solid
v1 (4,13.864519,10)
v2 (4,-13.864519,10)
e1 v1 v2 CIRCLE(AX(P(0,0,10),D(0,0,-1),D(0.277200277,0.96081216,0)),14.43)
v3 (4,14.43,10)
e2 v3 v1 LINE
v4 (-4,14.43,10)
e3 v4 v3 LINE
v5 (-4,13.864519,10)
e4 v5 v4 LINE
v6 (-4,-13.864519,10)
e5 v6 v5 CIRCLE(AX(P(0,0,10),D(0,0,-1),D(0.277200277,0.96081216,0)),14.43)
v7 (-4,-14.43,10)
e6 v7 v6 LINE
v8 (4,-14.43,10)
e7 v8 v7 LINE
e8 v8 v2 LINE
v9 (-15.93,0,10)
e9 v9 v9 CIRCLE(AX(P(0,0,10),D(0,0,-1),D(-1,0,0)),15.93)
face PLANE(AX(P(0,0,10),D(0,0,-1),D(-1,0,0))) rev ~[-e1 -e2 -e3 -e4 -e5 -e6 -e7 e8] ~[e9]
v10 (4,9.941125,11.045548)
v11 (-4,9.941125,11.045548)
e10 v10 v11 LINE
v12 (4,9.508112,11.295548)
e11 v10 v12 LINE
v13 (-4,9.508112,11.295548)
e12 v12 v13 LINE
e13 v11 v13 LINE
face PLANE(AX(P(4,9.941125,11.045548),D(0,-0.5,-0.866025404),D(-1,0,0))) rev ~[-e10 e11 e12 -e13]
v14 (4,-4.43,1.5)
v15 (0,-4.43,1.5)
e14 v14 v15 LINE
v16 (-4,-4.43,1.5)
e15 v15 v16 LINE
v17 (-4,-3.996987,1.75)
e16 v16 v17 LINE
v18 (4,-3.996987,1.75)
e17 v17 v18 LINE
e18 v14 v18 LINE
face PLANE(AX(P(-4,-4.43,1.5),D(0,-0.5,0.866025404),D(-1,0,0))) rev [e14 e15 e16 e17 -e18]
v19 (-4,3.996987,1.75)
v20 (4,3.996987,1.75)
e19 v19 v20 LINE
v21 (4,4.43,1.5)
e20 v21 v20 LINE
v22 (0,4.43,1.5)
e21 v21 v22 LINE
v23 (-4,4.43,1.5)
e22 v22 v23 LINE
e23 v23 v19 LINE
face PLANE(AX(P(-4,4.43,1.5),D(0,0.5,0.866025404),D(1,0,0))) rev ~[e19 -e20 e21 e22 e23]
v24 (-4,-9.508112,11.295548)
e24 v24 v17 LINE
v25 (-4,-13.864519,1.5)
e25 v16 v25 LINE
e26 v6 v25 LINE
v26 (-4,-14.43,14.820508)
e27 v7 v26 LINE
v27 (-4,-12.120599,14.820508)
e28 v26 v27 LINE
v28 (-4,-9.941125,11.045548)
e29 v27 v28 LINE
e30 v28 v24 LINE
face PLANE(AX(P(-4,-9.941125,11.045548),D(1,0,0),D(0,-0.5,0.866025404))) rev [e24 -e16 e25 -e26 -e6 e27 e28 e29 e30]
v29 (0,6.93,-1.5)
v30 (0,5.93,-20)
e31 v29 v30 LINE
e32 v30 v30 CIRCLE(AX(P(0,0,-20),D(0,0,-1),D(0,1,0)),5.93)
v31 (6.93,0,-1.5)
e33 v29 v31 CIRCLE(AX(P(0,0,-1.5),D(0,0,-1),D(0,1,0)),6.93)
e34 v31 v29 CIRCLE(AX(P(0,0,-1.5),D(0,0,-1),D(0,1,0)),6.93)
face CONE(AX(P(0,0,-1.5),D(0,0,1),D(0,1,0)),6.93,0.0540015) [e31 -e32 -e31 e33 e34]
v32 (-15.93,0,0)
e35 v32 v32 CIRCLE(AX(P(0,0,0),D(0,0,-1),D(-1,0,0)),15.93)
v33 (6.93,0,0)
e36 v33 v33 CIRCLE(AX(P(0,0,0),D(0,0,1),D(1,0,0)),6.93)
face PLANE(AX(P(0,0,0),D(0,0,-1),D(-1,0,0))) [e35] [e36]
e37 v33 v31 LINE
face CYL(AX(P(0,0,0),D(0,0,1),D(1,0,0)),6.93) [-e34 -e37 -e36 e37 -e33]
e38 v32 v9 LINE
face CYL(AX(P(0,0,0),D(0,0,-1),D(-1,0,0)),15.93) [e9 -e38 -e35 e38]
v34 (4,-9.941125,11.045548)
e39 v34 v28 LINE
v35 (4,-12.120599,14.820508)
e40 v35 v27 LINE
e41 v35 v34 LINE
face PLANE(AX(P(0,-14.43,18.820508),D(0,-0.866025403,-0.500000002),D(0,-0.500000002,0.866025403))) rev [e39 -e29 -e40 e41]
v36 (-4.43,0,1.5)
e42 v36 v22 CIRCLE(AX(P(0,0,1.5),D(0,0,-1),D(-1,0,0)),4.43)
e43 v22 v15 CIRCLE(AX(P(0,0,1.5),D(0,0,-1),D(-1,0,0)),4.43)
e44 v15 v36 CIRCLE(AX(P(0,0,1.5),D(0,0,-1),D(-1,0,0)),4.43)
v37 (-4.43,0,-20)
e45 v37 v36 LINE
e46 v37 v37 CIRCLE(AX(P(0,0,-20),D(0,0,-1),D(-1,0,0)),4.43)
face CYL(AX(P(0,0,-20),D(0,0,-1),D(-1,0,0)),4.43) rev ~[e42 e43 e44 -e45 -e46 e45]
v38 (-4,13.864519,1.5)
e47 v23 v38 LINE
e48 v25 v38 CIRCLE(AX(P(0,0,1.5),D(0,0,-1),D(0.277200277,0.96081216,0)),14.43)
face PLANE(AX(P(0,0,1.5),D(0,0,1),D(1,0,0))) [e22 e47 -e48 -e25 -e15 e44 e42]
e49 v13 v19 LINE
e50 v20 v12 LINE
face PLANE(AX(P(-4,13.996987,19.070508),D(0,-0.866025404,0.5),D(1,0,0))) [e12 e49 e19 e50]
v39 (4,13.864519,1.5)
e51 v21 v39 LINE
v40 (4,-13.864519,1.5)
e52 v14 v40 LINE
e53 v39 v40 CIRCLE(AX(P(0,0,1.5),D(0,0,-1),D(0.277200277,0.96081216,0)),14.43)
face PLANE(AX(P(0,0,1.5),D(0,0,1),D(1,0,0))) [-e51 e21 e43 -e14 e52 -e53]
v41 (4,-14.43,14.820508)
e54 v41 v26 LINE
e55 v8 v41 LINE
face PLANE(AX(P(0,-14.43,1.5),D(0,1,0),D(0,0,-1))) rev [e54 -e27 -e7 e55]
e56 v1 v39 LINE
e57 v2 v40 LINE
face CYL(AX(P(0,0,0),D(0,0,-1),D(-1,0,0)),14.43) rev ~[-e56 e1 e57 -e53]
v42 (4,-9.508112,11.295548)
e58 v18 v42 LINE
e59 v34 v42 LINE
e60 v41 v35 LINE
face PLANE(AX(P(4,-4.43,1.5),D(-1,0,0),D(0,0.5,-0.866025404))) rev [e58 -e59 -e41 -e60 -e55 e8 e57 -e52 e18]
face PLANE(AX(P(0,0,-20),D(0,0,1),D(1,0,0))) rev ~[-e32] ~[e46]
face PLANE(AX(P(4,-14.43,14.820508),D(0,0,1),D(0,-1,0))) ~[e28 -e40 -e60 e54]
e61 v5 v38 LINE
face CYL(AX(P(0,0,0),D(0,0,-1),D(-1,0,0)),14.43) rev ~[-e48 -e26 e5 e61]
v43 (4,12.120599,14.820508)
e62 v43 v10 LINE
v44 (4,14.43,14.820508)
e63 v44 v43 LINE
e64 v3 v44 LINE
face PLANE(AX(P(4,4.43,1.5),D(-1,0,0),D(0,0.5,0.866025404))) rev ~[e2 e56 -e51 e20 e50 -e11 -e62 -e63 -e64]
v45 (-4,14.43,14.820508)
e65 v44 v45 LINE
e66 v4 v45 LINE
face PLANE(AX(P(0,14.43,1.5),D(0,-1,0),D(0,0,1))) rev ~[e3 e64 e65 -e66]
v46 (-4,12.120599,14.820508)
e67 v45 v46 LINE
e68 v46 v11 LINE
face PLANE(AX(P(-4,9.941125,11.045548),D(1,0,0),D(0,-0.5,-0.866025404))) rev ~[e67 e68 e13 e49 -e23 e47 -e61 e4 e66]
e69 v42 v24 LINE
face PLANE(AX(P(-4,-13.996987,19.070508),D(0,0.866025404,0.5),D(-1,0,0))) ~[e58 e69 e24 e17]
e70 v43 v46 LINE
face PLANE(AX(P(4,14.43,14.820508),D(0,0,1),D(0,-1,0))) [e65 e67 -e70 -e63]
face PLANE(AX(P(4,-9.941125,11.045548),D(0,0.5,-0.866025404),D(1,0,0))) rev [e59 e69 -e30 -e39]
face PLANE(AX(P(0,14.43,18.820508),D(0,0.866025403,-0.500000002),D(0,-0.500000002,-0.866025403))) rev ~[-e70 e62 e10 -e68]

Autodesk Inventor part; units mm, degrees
ref_plane "YZ Plane" through (0, 0, 0) normal (1, 0, 0) x (0, 1, 0)
ref_plane "XZ Plane" through (0, 0, 0) normal (0, 1, 0) x (-1, 0, 0)
ref_plane "XY Plane" through (0, 0, 0) normal (0, 0, 1) x (1, 0, 0)
sketch "Sketch1" plane through (0, 0, 0) normal (0, 0, 1) x (1, 0, 0)
  circle A0 centre (0, 0) radius 6.94 construction
  circle A1 centre (0, 0) radius 6.93
  point P0 (0, 0)
  dimension "d0" = 0.01
sketch "Sketch1 outline for Extrusion1" plane through (0, 0, 0) normal (0, 0, 1) x (1, 0, 0)
  circle A0 centre (0, 0) radius 6.93
extrude "Extrusion1" add sketch "Sketch1 outline for Extrusion1" against normal blind 20
sketch "Sketch2" plane through (0, 0, 0) normal (1, 0, 0) x (0, 1, 0)
  line L0 (-6.93, -20) -> (6.93, -20) construction
  line L1 (-6.93, 0) -> (6.93, 0) construction
  line L2 (6.93, -20) -> (6.93, -1.5)
  line L3 (6.93, -1.5) -> (5.93, -20)
  line L4 (6.93, -20) -> (5.93, -20)
  line L5 (0, 4) -> (0, -24) projected
  point P0 (0, 0)
  dimension "d3" = 1.5
  dimension "d4" = 1
sketch "Sketch2 outline for Revolution1" plane through (0, 0, 0) normal (1, 0, 0) x (0, 1, 0)
  line L0 (5.93, -20) -> (6.93, -20)
  line L1 (6.93, -1.5) -> (5.93, -20)
  line L2 (6.93, -20) -> (6.93, -1.5)
revolve "Revolution1" cut sketch "Sketch2 outline for Revolution1" angle 360 about axis through (0, 0, 0) along (0, 0, -1)
sketch "Sketch3" plane through (0, 0, 0) normal (0, 0, 1) x (1, 0, 0)
  circle A0 centre (0, 0) radius 6.93 construction
  circle A1 centre (0, 0) radius 14.43
  dimension "d6" = 7.5
sketch "Sketch3 outline for Extrusion2" plane through (0, 0, 0) normal (0, 0, 1) x (1, 0, 0)
  circle A0 centre (0, 0) radius 14.43
extrude "Extrusion2" add sketch "Sketch3 outline for Extrusion2" along normal blind 1.5
sketch "Sketch4" plane through (0, 0, -20) normal (0, 0, -1) x (-1, 0, 0)
  circle A0 centre (0, 0) radius 5.93 construction
  circle A1 centre (0, 0) radius 4.43
  dimension "d9" = 1.5
sketch "Sketch4 outline for Extrusion3" plane through (0, 0, -20) normal (0, 0, -1) x (-1, 0, 0)
  circle A0 centre (0, 0) radius 4.43
extrude "Extrusion3" cut sketch "Sketch4 outline for Extrusion3" against normal through all
sketch "Sketch5" plane through (0, 0, 0) normal (1, 0, 0) x (0, 1, 0)
  line L0 (-4.43, 1.5) -> (4.43, 1.5) construction
  line L1 (14.43, 1.5) -> (-14.43, 1.5) construction
  line L2 (4.43, 1.5) -> (14.43, 1.5)
  line L3 (14.43, 1.5) -> (14.43, 18.820508)
  line L4 (14.43, 18.820508) -> (4.43, 1.5)
  point P0 (0, 0)
  dimension "d15" = 60
sketch "Sketch5 outline for Extrusion4" plane through (0, 0, 0) normal (1, 0, 0) x (0, 1, 0)
  line L0 (14.43, 18.820508) -> (4.43, 1.5)
  line L1 (14.43, 1.5) -> (14.43, 18.820508)
  line L2 (4.43, 1.5) -> (14.43, 1.5)
extrude "Extrusion4" add sketch "Sketch5 outline for Extrusion4" along normal mid plane 8
ref_plane "Work Plane1" through (0, 4.43, 1.5) normal (0, 0.5, 0.8660254) x (-1, 0, 0)
sketch "Sketch6" plane through (-4, 14.43, 18.820508) normal (0, -0.8660254, 0.5) x (1, 0, 0)
  line L0 (0, -20) -> (0, 0)
  line L1 (0.50115, -8.72775) -> (7.50139, -8.72775)
  line L2 (8, -20) -> (0, -20)
  line L3 (0, -20) -> (0, -8.97775)
  line L4 (0, -8.97775) -> (8, -8.97775)
  line L5 (8, -8.97775) -> (8, -20)
  point P0 (4, -23.514038)
  dimension "d16" = 0.25
sketch "Sketch6 outline for Extrusion5" plane through (-4, 14.43, 18.820508) normal (0, -0.8660254, 0.5) x (1, 0, 0)
  line L0 (0, -20) -> (8, -20)
  line L1 (0, -8.97775) -> (0, -20)
  line L2 (8, -8.97775) -> (0, -8.97775)
  line L3 (8, -20) -> (8, -8.97775)
extrude "Extrusion5" add sketch "Sketch6 outline for Extrusion5" along normal blind 0.5
sketch "Sketch7" plane through (4, 0, 0) normal (1, 0, 0) x (0, 0, -1)
  line L0 (-1.5, 14.43) -> (-18.820508, 14.43) construction
  line L1 (-18.820508, 14.43) -> (-11.045549, 9.941125) construction
  line L2 (-18.820508, 14.43) -> (-14.820508, 14.43)
  line L3 (-18.820508, 14.43) -> (-14.820508, 12.120599)
  line L4 (-14.820508, 14.43) -> (-14.820508, 12.120599)
  point P0 (0, 0)
  dimension "d19" = 4
sketch "Sketch7 outline for Extrusion6" plane through (4, 0, 0) normal (1, 0, 0) x (0, 0, -1)
  line L0 (-18.820508, 14.43) -> (-14.820508, 14.43)
  line L1 (-14.820508, 14.43) -> (-14.820508, 12.120599)
  line L2 (-14.820508, 12.120599) -> (-18.820508, 14.43)
extrude "Extrusion6" cut sketch "Sketch7 outline for Extrusion6" against normal up to surface (8 mm away)
sketch "Sketch8" plane through (0, 0, 0) normal (0, 0, -1) x (-1, 0, 0)
  circle A0 centre (0, 0) radius 14.43 construction
  circle A1 centre (0, 0) radius 6.93 construction
  circle A2 centre (0, 0) radius 14.43
  circle A3 centre (0, 0) radius 15.93
  dimension "d22" = 0
  dimension "d23" = 1.5
sketch "Sketch8 outline for Extrusion7" plane through (0, 0, 0) normal (0, 0, -1) x (-1, 0, 0)
  circle A0 centre (0, 0) radius 15.93
  circle A1 centre (0, 0) radius 14.43
extrude "Extrusion7" add sketch "Sketch8 outline for Extrusion7" against normal blind 10
mirror "Mirror1" about plane through (0, 0, 0) normal (0, 1, 0) of "Extrusion4", "Extrusion5", "Extrusion6"
properties part number "ECoG_holder_3p0"
